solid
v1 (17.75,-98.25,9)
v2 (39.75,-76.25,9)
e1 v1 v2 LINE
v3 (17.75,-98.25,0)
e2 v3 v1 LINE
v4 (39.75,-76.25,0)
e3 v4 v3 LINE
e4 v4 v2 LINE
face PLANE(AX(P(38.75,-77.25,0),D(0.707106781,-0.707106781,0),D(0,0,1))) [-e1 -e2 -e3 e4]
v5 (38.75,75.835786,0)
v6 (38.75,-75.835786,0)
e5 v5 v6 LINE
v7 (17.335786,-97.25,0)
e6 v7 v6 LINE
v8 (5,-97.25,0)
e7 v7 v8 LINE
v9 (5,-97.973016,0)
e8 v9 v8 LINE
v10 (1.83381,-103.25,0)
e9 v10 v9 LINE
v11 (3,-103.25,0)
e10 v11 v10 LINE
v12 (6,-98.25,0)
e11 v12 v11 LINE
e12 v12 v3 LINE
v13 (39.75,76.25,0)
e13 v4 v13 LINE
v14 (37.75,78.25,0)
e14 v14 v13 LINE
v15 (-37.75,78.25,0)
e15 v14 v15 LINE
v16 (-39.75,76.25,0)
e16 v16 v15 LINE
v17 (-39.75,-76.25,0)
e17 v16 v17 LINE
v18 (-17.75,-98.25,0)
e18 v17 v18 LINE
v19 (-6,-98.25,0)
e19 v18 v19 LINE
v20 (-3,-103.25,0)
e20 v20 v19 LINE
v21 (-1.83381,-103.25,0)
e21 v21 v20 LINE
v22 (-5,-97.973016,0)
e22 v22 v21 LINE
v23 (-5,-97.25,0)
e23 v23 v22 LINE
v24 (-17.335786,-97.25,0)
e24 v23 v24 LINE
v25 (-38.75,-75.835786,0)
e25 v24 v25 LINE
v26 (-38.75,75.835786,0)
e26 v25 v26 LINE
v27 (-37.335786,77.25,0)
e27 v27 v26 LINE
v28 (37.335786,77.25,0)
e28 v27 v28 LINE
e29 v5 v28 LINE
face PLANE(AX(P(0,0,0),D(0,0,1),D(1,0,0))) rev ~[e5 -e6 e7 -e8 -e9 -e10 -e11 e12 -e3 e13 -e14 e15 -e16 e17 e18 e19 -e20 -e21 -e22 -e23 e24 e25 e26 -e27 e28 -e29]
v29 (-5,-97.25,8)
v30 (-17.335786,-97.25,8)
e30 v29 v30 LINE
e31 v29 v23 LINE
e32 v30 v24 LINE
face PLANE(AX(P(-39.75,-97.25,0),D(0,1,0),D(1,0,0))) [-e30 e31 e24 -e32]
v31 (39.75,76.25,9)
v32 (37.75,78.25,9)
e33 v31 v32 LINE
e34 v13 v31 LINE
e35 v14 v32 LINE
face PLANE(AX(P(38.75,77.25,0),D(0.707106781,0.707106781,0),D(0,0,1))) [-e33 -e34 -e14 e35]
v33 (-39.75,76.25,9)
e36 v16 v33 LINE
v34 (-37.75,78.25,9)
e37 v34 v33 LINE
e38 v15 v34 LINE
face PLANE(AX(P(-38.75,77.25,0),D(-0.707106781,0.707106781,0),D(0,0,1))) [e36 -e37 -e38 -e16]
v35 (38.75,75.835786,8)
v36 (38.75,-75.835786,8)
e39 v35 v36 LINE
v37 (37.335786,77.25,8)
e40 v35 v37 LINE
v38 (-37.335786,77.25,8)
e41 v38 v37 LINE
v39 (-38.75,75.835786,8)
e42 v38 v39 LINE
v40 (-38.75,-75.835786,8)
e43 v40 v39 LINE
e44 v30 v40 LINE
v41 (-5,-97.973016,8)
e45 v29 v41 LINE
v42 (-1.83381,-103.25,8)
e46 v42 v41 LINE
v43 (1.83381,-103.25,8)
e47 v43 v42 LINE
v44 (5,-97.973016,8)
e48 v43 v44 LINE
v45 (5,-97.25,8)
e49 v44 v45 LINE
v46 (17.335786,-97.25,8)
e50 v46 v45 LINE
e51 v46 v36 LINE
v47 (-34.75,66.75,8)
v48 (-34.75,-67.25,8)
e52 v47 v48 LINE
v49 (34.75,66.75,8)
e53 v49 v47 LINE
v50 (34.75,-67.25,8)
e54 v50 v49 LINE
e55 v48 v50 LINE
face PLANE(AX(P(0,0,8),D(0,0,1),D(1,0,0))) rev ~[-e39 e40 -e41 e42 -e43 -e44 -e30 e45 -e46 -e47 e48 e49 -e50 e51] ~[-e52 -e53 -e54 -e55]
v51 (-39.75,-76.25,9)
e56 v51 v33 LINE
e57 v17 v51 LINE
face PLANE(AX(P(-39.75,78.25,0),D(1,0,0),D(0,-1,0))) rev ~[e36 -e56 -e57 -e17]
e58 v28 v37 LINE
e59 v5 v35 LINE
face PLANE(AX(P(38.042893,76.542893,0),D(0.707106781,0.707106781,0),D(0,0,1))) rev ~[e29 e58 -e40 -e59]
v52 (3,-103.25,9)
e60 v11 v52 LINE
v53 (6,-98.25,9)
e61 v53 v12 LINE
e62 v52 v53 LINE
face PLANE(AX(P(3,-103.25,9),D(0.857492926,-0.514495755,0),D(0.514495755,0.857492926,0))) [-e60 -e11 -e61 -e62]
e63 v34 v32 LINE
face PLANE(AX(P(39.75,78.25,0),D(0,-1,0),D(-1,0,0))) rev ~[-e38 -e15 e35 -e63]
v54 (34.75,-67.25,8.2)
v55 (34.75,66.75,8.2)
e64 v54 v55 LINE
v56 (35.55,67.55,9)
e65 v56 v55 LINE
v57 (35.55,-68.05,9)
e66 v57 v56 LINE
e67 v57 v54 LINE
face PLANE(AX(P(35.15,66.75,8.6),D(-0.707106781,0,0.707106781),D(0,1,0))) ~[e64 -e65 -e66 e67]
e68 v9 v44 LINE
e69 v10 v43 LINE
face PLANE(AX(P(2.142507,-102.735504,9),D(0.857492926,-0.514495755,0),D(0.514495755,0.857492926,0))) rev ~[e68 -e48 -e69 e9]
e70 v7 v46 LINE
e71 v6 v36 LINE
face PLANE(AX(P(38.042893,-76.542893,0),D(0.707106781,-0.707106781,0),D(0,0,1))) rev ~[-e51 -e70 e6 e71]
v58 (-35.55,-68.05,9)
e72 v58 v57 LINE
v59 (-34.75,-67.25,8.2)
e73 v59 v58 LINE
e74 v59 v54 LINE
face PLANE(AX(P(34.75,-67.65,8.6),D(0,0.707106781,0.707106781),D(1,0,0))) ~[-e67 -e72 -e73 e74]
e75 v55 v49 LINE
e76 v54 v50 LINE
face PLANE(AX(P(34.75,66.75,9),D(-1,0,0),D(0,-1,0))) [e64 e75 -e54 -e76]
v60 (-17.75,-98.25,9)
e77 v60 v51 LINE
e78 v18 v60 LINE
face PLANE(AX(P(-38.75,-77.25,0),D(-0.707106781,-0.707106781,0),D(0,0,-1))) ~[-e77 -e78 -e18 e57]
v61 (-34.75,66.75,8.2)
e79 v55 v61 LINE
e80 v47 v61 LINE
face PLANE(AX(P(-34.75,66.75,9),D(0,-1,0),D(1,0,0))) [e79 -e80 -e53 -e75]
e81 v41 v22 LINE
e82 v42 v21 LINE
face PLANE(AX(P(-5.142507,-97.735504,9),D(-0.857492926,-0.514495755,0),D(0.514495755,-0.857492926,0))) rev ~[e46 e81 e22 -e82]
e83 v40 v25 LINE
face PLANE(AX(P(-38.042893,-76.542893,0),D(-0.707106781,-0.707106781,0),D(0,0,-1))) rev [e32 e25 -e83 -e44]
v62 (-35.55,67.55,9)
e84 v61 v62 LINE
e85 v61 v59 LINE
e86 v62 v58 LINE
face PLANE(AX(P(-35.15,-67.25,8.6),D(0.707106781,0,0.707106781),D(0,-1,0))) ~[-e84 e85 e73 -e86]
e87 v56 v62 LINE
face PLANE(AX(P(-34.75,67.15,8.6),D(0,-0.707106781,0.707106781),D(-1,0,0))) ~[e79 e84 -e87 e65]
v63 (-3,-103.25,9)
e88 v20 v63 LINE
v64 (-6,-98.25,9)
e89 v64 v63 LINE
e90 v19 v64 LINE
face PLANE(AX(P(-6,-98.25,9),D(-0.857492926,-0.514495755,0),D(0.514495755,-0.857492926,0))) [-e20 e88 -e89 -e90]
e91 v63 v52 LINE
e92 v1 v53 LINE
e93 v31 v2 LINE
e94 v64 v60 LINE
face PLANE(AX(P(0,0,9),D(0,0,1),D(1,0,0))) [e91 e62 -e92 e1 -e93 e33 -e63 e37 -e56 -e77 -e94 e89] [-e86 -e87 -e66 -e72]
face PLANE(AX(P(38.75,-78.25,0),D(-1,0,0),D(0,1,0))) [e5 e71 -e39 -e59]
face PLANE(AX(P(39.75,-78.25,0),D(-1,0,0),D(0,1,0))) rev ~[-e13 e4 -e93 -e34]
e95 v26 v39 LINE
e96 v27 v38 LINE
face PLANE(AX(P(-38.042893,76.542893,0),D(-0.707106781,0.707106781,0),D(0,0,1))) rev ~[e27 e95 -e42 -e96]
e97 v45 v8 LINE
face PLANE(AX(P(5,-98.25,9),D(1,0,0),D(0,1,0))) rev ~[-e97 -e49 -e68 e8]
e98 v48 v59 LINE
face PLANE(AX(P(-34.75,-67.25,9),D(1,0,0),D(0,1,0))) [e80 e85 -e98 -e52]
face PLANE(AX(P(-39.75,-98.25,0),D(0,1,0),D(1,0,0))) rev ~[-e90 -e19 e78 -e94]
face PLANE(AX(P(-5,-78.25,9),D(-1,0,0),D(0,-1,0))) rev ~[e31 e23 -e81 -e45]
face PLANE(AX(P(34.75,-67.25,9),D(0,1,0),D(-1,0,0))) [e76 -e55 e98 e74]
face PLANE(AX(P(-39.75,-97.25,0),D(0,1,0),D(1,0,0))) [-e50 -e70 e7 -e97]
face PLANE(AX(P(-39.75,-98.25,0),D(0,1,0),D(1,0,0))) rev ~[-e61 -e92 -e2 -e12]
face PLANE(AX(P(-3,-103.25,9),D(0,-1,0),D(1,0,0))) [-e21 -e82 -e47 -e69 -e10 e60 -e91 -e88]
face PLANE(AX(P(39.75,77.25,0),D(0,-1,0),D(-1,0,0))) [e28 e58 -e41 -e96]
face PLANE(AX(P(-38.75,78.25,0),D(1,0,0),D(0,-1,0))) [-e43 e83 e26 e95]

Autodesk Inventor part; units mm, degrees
ref_plane "YZ Plane" through (0, 0, 0) normal (1, 0, 0) x (0, 1, 0)
ref_plane "XZ Plane" through (0, 0, 0) normal (0, 1, 0) x (-1, 0, 0)
ref_plane "XY Plane" through (0, 0, 0) normal (0, 0, 1) x (1, 0, 0)
sketch "Boceto1" plane through (0, 0, 0) normal (0, 0, 1) x (1, 0, 0)
  line L0 (-39.75, -78.25) -> (39.75, -78.25)
  line L1 (39.75, -78.25) -> (39.75, 78.25)
  line L2 (39.75, 78.25) -> (-39.75, 78.25)
  line L3 (-39.75, 78.25) -> (-39.75, -78.25)
  line L4 (-39.75, -78.25) -> (39.75, 78.25) construction
  line L5 (39.75, -78.25) -> (-39.75, 78.25) construction
  point P0 (0, 0)
  dimension "d0" = 79.5
  dimension "d1" = 156.5
extrude "Extrusión1" add sketch "Boceto1" along normal blind 9
sketch "Boceto2" plane through (0, 0, 9) normal (0, 0, 1) x (1, 0, 0)
  line L0 (-39.75, -78.25) -> (39.75, -78.25) projected
  line L1 (-6, -78.25) -> (-6, -98.25)
  line L2 (-6, -98.25) -> (-3, -103.25)
  line L3 (-3, -103.25) -> (3, -103.25)
  line L4 (3, -103.25) -> (6, -98.25)
  line L5 (6, -98.25) -> (6, -78.25)
  point P0 (0, 0)
  point P1 (6, -88.25)
  point P2 (-6, -88.25)
  point P3 (0, -78.25)
  point P4 (0, -103.25)
  point P5 (0, -78.25)
  dimension "d4" = 12
  dimension "d5" = 6
  dimension "d6" = 20
  dimension "d7" = 5
  dimension "d8" = 6
extrude "Extrusión2" add sketch "Boceto2" against normal up to surface (9 mm away)
chamfer "Chaflán2" distance 2 angle 45 4 edges at (-39.75, -78.25, 4.5) (-39.75, 78.25, 4.5) (39.75, -78.25, 4.5) (39.75, 78.25, 4.5)
shell "Vaciado1" thickness 1 removed faces 2 at (-2, 24.75, 0) at (-1, -103.25, 6)
sketch "Boceto3" plane through (0, 0, 9) normal (0, 0, 1) x (1, 0, 0)
  line L0 (-34.75, 66.75) -> (34.75, 66.75)
  line L1 (34.75, 66.75) -> (34.75, -67.25)
  line L2 (34.75, -67.25) -> (-34.75, -67.25)
  line L3 (-34.75, -67.25) -> (-34.75, 66.75)
  line L4 (-34.75, 66.75) -> (34.75, -67.25) construction
  line L5 (34.75, 66.75) -> (-34.75, -67.25) construction
  line L6 (37.3358, 77.25) -> (38.75, 75.8358) projected
  line L7 (38.75, -75.8358) -> (38.75, 75.8358) projected
  line L8 (38.75, -75.8358) -> (37.3358, -77.25) projected
  line L9 (5, -77.25) -> (37.3358, -77.25) projected
  line L10 (5, -97.973) -> (5, -77.25) projected
  line L11 (1.8338, -103.25) -> (5, -97.973) projected
  line L12 (-1.8338, -103.25) -> (1.8338, -103.25) projected
  line L13 (-5, -97.973) -> (-1.8338, -103.25) projected
  line L14 (-5, -77.25) -> (-5, -97.973) projected
  line L15 (-37.3358, -77.25) -> (-5, -77.25) projected
  line L16 (-37.3358, -77.25) -> (-38.75, -75.8358) projected
  line L17 (-38.75, 75.8358) -> (-38.75, -75.8358) projected
  line L18 (-38.75, 75.8358) -> (-37.3358, 77.25) projected
  line L19 (37.3358, 77.25) -> (-37.3358, 77.25) projected
  point P0 (0, 0)
  point P1 (0, -0.25)
  dimension "d18" = 4
  dimension "d19" = 4
  dimension "d20" = 10.5
  dimension "d21" = 10
extrude "Extrusión3" cut sketch "Boceto3" against normal blind 10 contours L0 L1 L2 L3
chamfer "Chaflán3" distance 0.8 angle 45 4 edges at (0, 66.75, 9) (34.75, -0.25, 9) (0, -67.25, 9) (-34.75, -0.25, 9)
move faces "Desplazar1" translate (0, -20, 0) faces at (-27.1667, -78.25, 3) (16.5833, -78.25, 3) (-26.5572, -77.25, 2.6667) (26.5572, -77.25, 5.3333)
equation "\"d5\" = 0.5 * d4"
properties part number "BiselTelefono"
